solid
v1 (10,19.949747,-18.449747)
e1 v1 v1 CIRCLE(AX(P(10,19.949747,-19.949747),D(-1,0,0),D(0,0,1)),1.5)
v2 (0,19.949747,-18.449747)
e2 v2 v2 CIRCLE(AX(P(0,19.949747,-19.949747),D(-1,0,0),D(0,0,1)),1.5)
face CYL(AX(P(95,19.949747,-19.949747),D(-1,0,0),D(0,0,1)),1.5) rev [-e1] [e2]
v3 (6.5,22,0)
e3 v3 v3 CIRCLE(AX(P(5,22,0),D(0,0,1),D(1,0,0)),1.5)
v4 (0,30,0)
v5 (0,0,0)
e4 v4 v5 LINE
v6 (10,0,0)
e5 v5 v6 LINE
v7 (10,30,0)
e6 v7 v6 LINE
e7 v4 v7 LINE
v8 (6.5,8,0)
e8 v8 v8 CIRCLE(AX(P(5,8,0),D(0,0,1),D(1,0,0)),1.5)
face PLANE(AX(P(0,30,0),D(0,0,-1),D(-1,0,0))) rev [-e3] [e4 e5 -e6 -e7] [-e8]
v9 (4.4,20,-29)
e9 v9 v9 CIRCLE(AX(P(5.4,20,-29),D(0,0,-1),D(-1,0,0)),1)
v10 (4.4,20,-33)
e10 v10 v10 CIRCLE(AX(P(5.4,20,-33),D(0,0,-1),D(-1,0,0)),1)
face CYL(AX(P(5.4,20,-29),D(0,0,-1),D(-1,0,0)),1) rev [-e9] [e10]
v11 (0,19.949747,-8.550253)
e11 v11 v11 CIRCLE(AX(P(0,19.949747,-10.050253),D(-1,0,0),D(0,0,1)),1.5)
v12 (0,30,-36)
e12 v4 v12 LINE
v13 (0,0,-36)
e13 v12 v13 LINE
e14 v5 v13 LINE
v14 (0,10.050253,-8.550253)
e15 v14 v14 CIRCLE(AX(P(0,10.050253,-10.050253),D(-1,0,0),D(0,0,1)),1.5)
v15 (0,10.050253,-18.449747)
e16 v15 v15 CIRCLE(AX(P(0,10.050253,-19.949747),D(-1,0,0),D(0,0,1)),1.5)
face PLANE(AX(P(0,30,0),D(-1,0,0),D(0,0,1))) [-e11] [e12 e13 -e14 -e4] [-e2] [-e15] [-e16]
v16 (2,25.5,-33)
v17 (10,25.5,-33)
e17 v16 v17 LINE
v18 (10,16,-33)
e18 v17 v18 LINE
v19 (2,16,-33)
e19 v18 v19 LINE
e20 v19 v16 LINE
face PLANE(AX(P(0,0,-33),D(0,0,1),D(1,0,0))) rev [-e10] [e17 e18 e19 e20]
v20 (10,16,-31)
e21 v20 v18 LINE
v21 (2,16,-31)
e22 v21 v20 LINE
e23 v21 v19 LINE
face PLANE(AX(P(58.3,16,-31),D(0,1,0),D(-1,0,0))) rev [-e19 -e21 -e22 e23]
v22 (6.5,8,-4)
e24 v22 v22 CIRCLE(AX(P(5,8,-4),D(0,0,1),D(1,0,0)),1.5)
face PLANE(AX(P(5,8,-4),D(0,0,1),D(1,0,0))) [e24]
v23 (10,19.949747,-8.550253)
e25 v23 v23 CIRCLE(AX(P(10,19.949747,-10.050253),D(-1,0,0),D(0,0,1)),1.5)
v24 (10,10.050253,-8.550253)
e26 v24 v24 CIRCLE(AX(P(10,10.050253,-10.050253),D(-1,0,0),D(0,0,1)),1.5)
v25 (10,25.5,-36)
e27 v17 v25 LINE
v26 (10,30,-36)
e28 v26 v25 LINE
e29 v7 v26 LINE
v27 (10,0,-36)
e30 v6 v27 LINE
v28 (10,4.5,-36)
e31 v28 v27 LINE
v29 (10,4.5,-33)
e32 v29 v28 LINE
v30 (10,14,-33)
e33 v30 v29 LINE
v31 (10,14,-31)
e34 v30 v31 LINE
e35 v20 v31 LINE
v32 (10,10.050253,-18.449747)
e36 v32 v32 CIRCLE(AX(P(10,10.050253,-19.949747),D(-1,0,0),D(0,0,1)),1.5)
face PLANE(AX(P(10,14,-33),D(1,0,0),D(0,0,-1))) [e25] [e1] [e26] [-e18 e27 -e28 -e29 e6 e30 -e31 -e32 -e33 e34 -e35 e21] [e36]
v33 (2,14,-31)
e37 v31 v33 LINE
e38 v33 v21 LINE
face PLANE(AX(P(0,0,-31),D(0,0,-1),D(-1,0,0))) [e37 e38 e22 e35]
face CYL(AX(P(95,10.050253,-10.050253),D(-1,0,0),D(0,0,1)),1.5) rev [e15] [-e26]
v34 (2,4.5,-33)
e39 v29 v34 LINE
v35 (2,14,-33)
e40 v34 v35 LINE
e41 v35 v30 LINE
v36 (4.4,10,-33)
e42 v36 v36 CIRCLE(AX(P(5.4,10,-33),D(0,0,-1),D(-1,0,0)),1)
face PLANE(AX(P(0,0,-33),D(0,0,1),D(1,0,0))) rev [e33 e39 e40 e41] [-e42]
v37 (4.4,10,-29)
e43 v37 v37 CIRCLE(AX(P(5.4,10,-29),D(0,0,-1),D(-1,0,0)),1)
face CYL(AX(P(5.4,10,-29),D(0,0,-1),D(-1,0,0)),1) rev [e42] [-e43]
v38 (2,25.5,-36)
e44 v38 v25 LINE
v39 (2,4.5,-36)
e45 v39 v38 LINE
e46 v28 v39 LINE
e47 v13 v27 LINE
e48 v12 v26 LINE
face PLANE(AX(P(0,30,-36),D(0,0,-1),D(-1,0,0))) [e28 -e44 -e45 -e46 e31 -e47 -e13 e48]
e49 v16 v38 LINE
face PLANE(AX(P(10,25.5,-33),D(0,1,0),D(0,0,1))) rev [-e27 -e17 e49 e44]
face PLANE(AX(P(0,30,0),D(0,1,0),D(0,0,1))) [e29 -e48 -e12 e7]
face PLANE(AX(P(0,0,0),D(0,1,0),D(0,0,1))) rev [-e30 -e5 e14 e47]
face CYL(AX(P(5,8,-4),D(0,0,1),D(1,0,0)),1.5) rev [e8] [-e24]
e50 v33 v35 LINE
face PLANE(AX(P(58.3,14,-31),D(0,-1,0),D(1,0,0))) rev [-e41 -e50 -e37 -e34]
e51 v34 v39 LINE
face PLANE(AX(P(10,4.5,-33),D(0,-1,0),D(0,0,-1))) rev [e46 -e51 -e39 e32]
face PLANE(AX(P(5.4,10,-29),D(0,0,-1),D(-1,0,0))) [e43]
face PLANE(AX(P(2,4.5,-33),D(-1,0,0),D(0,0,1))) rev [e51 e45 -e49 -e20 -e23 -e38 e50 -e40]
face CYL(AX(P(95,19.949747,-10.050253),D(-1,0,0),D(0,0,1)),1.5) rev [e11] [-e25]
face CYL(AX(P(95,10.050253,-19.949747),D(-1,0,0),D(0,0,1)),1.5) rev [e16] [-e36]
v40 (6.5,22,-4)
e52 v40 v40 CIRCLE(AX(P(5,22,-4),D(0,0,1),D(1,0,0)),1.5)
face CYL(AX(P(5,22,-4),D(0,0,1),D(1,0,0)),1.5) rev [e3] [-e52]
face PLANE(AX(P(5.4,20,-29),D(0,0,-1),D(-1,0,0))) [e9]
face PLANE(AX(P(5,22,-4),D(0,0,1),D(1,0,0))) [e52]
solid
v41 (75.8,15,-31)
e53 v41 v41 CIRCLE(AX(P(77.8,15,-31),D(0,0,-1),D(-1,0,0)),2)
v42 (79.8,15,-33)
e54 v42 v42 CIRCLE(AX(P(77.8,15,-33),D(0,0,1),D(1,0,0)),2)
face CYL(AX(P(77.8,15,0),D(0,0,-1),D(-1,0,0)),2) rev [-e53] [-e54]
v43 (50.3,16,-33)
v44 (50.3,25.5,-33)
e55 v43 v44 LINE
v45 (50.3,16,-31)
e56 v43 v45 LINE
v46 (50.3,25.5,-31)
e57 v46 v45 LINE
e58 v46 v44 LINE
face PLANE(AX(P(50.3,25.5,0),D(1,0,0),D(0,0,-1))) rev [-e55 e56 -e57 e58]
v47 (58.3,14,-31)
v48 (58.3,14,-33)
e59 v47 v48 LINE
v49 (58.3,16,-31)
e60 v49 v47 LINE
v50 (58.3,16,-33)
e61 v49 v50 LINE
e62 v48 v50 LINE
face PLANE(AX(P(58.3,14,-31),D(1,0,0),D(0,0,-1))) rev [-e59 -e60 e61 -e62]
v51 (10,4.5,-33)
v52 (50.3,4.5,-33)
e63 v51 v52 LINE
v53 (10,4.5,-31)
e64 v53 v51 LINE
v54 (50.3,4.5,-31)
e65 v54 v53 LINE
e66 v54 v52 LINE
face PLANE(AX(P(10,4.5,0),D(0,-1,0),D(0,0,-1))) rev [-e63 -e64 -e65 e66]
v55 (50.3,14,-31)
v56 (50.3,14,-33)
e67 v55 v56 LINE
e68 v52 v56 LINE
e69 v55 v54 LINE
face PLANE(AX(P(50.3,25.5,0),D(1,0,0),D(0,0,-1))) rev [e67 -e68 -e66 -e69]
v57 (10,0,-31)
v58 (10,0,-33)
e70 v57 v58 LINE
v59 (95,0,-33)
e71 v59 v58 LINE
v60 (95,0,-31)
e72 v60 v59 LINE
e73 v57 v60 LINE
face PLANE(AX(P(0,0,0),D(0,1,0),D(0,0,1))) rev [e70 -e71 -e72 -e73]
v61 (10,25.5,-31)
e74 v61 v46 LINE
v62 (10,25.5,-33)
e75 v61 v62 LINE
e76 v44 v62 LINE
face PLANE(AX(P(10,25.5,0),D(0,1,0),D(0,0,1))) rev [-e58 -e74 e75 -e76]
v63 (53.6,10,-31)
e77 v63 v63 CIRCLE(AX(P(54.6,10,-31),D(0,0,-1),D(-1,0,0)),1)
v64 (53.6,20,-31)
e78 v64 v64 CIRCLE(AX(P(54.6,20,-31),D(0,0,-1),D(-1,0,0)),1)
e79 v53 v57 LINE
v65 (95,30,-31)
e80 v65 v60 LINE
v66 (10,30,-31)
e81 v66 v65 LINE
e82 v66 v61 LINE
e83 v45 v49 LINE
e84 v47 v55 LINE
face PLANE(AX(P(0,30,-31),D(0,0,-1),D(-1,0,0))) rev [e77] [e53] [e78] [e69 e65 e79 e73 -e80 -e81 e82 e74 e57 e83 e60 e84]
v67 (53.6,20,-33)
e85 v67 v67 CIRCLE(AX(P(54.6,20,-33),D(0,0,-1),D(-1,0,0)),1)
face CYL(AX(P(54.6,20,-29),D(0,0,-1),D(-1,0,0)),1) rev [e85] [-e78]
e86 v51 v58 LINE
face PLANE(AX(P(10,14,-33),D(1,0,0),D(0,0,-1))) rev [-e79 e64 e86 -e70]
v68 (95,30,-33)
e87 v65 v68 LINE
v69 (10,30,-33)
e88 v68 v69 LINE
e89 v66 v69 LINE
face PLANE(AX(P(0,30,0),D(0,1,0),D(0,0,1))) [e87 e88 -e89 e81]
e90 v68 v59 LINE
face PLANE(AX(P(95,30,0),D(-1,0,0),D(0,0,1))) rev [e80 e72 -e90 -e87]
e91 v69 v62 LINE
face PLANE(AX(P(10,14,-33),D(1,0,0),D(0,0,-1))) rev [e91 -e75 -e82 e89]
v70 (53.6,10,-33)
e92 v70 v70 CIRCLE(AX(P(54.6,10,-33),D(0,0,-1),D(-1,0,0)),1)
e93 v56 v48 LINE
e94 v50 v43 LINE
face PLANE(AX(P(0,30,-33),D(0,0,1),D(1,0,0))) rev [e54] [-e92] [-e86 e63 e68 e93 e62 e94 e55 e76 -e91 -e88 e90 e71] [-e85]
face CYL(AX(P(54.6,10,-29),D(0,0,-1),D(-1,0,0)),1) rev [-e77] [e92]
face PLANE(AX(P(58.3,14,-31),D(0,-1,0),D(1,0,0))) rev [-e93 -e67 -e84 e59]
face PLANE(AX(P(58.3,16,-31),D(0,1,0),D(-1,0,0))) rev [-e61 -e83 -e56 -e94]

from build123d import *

# Parameters (mm, degrees)
EXTRUDE_1_DEPTH     = 30
SKETCH_2_R          = 1.5
CUT_EXTRUDE_1_DEPTH = 106.929221653
SKETCH_3_W          = 40.3
SKETCH_3_H          = 21
CUT_EXTRUDE_2_DEPTH = 106.929221653
SKETCH_4_W          = 8
SKETCH_4_H          = 21
CUT_EXTRUDE_3_DEPTH = 3
SKETCH_5_W          = 56.3
SKETCH_5_H          = 2
CUT_EXTRUDE_4_DEPTH = 5
SKETCH_6_R          = 1
CUT_EXTRUDE_5_DEPTH = 4
SKETCH_7_R          = 2
CUT_EXTRUDE_6_DEPTH = 106.929221653
SKETCH_8_R          = 1.5
CUT_EXTRUDE_7_DEPTH = 4


with BuildPart() as part:
    # Эскиз1 → Бобышка-Вытянуть1 (new body)
    with BuildSketch(Plane(origin=(0, 0, 0), x_dir=(1, 0, 0), z_dir=(0, 1, 0))):
        Polygon((0, 0), (10, 0), (10, 31), (95, 31), (95, 33), (10, 33), (10, 36), (0, 36), align=None)
    extrude(amount=EXTRUDE_1_DEPTH)

    # Эскиз2 → Вырез-Вытянуть1 (cut, through all)
    with BuildSketch(Plane.ZY):
        with Locations((-19.949747468, 19.949747468)):
            Circle(SKETCH_2_R)
        with Locations((-10.050252532, 19.949747468)):
            Circle(SKETCH_2_R)
        with Locations((-19.949747468, 10.050252532)):
            Circle(SKETCH_2_R)
        with Locations((-10.050252532, 10.050252532)):
            Circle(SKETCH_2_R)
    extrude(amount=-CUT_EXTRUDE_1_DEPTH, mode=Mode.SUBTRACT)

    # Эскиз3 → Вырез-Вытянуть2 (cut, through all)
    with BuildSketch(Plane(origin=(0, 0, -36), x_dir=(-1, 0, 0), z_dir=(0, 0, -1))):
        with Locations((-30.15, 15)):
            Rectangle(SKETCH_3_W, SKETCH_3_H)
    extrude(amount=-CUT_EXTRUDE_2_DEPTH, mode=Mode.SUBTRACT)

    # Эскиз4 → Вырез-Вытянуть3 (cut)
    with BuildSketch(Plane(origin=(0, 0, -36), x_dir=(-1, 0, 0), z_dir=(0, 0, -1))):
        with Locations((-6, 15)):
            Rectangle(SKETCH_4_W, SKETCH_4_H)
    extrude(amount=-CUT_EXTRUDE_3_DEPTH, mode=Mode.SUBTRACT)

    # Эскиз5 → Вырез-Вытянуть4 (cut)
    with BuildSketch(Plane(origin=(0, 0, -36), x_dir=(-1, 0, 0), z_dir=(0, 0, -1))):
        with Locations((-30.15, 15)):
            Rectangle(SKETCH_5_W, SKETCH_5_H)
    extrude(amount=-CUT_EXTRUDE_4_DEPTH, mode=Mode.SUBTRACT)

    # Эскиз6 → Вырез-Вытянуть5 (cut)
    with BuildSketch(Plane(origin=(0, 0, -33), x_dir=(-1, 0, 0), z_dir=(0, 0, -1))):
        with Locations((-5.4, 10)):
            Circle(SKETCH_6_R)
        with Locations((-54.6, 10)):
            Circle(SKETCH_6_R)
        with Locations((-5.4, 20)):
            Circle(SKETCH_6_R)
        with Locations((-54.6, 20)):
            Circle(SKETCH_6_R)
    extrude(amount=-CUT_EXTRUDE_5_DEPTH, mode=Mode.SUBTRACT)

    # Эскиз7 → Вырез-Вытянуть6 (cut, through all)
    with BuildSketch(Plane(origin=(0, 0, -36), x_dir=(-1, 0, 0), z_dir=(0, 0, -1))):
        with Locations((-77.8, 15)):
            Circle(SKETCH_7_R)
    extrude(amount=-CUT_EXTRUDE_6_DEPTH, mode=Mode.SUBTRACT)

    # Эскиз8 → Вырез-Вытянуть7 (cut)
    with BuildSketch(Plane.XY):
        with Locations((5, 22)):
            Circle(SKETCH_8_R)
        with Locations((5, 8)):
            Circle(SKETCH_8_R)
    extrude(amount=-CUT_EXTRUDE_7_DEPTH, mode=Mode.SUBTRACT)


with BuildPart() as body_2:
    # Split Bodies 1: the piece on the far side of the plane
    add(part.part)
    split(bisect_by=Plane(origin=(10, 30, 0), x_dir=(0, 0, -1), z_dir=(-1, 0, 0)), keep=Keep.BOTTOM)


with BuildPart() as part_1:
    add(part.part)

    # Split Bodies 1
    split(bisect_by=Plane(origin=(10, 30, 0), x_dir=(0, 0, -1), z_dir=(-1, 0, 0)), keep=Keep.TOP)


solid = Compound([body_2.part, part_1.part])
